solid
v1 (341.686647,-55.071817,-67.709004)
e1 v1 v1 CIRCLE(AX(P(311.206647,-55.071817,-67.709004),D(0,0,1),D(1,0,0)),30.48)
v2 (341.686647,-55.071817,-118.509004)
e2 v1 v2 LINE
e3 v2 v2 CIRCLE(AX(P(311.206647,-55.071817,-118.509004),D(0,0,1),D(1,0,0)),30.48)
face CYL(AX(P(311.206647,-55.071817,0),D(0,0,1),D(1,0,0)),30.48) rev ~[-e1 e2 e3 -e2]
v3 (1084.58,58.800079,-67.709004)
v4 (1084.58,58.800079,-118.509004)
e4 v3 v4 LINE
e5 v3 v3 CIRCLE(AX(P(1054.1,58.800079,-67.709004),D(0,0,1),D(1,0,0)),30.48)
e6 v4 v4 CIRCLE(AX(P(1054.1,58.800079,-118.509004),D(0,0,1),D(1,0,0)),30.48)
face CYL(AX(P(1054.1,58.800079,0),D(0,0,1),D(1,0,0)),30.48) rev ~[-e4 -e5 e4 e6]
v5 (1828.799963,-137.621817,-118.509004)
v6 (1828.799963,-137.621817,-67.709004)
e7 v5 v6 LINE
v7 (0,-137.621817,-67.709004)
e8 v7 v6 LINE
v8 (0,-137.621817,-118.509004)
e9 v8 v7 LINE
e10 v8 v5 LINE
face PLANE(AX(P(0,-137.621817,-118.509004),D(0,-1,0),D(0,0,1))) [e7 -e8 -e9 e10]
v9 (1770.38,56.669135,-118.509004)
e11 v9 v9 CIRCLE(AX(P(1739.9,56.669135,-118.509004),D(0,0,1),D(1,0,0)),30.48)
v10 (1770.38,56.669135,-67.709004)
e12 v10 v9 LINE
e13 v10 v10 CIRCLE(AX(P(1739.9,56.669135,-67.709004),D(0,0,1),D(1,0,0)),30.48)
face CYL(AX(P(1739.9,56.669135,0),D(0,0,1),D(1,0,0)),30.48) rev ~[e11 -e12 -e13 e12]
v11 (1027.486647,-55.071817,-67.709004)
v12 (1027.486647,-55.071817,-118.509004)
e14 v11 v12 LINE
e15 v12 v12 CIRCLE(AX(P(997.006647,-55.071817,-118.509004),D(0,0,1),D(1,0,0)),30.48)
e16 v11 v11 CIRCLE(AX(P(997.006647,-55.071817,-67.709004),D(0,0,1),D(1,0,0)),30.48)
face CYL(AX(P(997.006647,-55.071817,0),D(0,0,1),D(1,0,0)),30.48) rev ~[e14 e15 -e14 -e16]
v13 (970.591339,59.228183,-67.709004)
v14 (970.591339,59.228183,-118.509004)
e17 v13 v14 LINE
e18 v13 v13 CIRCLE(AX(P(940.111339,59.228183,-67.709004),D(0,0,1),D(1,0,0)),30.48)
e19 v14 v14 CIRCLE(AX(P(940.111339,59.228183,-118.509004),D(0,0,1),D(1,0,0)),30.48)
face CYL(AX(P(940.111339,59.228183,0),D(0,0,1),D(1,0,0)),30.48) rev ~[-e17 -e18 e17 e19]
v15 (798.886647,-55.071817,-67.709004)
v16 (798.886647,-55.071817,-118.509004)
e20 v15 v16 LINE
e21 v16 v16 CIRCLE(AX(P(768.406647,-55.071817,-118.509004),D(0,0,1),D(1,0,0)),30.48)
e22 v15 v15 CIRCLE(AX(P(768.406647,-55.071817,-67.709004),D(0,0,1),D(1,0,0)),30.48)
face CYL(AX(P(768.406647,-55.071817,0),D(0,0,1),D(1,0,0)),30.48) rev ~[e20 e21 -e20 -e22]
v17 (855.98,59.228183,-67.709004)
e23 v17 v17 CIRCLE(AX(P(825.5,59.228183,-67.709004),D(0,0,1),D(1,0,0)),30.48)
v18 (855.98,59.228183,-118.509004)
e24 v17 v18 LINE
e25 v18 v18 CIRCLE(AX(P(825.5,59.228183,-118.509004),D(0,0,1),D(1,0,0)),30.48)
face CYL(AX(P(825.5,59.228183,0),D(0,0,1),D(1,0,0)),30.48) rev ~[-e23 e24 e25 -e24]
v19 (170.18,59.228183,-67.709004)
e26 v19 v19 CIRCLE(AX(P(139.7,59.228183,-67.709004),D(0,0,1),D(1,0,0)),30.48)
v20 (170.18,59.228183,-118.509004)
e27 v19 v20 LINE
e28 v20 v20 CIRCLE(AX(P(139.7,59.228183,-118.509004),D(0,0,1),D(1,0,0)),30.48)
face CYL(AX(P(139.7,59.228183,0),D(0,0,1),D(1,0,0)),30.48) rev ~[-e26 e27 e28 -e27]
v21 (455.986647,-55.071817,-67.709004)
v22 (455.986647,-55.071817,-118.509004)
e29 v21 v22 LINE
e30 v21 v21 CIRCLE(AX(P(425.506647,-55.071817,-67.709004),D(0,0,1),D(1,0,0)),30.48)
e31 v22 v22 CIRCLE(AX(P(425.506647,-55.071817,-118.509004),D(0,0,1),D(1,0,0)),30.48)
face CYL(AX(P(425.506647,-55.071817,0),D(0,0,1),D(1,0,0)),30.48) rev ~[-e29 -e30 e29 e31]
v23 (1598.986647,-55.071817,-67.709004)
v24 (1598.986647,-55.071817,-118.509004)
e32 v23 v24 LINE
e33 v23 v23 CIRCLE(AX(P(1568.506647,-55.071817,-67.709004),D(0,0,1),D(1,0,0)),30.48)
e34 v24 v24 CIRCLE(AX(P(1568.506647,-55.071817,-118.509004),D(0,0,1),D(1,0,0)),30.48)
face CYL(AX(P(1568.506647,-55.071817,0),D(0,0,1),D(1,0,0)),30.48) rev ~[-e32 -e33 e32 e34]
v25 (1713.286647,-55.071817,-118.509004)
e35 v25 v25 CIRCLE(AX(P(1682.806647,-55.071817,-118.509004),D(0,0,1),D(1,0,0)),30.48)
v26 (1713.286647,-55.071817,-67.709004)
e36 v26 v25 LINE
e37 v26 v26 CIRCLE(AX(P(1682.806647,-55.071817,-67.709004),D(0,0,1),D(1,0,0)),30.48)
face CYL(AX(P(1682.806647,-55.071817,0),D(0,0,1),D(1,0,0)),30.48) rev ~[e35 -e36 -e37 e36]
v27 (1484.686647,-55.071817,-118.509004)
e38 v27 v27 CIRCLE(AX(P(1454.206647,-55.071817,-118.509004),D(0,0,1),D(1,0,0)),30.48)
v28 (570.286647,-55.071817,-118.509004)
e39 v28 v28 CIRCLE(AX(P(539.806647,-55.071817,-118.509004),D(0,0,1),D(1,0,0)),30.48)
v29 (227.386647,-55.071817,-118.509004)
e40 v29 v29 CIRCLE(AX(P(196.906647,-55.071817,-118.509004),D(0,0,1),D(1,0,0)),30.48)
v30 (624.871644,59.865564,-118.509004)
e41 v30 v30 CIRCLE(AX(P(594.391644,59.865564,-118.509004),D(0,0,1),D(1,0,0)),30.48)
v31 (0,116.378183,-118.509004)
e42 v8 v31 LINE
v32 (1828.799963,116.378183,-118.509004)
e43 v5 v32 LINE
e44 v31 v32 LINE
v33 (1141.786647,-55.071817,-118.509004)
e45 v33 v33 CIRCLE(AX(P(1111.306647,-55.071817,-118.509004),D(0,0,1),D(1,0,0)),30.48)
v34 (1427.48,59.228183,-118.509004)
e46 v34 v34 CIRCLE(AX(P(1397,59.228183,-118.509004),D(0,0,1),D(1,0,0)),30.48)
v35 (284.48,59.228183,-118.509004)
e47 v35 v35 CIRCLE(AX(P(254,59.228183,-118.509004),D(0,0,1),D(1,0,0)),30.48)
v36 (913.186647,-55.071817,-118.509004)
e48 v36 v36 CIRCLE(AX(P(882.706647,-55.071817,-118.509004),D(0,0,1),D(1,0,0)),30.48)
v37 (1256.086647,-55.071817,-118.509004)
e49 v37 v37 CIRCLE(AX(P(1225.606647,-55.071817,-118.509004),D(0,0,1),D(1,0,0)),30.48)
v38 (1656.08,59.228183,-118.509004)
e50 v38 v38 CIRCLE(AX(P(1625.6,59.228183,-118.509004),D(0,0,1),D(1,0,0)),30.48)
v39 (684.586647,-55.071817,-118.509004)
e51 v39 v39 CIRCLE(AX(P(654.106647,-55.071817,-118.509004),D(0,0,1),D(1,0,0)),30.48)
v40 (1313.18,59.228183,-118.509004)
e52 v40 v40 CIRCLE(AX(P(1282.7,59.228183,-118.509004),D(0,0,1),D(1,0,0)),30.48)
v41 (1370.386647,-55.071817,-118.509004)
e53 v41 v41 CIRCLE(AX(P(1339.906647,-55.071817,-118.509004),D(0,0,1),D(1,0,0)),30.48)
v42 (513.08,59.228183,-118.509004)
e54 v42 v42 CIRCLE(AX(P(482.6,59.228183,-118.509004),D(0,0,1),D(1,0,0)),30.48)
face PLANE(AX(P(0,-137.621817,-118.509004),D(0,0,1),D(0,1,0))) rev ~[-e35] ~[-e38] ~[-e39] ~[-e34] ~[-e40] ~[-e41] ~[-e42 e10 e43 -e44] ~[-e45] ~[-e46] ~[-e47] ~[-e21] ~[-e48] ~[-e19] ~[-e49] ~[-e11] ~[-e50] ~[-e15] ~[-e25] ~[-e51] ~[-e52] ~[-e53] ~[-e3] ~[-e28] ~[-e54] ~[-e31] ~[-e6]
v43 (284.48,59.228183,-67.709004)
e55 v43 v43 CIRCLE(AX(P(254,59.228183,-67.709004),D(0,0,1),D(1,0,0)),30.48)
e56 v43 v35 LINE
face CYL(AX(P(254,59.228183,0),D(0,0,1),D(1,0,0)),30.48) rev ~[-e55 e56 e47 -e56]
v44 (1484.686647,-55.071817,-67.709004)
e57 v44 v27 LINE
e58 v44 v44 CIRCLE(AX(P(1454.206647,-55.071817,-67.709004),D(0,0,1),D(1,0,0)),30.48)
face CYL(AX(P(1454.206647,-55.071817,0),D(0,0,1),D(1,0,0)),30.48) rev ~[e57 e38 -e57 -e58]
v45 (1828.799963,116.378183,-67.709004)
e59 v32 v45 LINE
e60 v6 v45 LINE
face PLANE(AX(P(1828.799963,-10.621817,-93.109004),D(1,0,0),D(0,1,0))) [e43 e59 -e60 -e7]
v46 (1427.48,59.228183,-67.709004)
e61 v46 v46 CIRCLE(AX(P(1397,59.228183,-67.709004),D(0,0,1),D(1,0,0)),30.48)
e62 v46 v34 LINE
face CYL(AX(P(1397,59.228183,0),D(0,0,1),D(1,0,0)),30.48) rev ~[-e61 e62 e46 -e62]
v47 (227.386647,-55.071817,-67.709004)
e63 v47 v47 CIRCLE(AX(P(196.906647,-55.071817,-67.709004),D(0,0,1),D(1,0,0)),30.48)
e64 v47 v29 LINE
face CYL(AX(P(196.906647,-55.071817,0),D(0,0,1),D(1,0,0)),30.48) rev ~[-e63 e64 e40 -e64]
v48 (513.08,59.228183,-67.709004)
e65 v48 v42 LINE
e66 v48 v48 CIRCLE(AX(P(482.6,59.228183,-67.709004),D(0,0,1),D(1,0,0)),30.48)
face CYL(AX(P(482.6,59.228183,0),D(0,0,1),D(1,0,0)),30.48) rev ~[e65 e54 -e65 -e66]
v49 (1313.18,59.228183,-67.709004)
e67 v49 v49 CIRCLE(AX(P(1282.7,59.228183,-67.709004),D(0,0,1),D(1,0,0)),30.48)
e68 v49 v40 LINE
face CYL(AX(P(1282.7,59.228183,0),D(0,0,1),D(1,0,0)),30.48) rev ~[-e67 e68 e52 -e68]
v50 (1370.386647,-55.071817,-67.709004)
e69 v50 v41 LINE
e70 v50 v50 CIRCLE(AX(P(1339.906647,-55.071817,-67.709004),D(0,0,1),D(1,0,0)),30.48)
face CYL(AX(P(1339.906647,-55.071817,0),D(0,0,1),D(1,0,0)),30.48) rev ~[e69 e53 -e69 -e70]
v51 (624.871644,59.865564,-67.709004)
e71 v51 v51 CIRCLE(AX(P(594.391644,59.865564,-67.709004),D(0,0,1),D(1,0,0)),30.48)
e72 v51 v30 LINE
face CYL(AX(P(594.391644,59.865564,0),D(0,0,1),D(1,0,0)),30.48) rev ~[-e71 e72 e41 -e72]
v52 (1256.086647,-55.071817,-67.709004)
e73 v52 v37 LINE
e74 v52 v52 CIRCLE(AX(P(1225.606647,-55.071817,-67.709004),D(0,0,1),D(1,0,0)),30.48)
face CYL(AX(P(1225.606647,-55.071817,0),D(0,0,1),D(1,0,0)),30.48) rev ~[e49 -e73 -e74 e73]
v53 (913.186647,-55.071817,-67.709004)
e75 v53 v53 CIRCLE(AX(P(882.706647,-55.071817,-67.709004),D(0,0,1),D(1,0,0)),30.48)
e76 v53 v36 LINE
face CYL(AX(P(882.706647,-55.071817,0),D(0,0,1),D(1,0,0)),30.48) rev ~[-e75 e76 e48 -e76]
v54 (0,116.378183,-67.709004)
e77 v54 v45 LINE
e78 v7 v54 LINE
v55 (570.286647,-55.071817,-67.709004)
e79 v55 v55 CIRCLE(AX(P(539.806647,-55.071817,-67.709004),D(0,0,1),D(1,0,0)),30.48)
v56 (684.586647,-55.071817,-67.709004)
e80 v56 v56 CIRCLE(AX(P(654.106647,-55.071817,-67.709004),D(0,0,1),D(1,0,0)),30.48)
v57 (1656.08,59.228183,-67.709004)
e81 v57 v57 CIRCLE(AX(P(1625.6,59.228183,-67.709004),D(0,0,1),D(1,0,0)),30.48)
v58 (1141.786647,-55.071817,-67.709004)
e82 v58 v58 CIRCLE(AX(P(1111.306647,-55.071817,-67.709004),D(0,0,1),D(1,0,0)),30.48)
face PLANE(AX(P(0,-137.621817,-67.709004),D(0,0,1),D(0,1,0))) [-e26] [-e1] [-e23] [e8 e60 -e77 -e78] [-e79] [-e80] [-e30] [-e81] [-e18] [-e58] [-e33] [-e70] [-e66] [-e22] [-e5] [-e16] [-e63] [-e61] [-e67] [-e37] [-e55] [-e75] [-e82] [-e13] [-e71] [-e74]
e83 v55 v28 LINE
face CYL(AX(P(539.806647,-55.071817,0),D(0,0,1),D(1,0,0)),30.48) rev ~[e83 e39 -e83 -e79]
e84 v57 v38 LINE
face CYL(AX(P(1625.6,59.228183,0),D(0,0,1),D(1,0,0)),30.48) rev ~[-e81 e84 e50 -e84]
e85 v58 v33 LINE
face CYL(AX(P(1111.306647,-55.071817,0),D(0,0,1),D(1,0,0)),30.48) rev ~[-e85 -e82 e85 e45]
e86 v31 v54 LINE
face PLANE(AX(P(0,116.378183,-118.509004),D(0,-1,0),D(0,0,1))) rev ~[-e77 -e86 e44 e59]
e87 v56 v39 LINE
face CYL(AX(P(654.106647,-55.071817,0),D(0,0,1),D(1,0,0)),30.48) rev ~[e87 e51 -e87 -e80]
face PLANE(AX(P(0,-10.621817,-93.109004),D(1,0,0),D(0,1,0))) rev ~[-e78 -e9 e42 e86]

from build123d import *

# Parameters (mm, degrees)
F0_W     = 254
F0_H     = 50.8
F1_DEPTH = 1828.7999629974
F2_R     = 30.48
F3_DEPTH = 127


# Not quite as in the source:
# - a feature names something its author has since deleted; it is built from what else it names


with BuildPart() as f1:
    # F0 (on Right) → F1 (new body)
    with BuildSketch(Plane.YZ):
        with Locations((-10.6218170047, -93.1090038955)):
            Rectangle(F0_W, F0_H)
    extrude(amount=F1_DEPTH)

    # F2 (on Top) → F3 (cut)
    with BuildSketch(Plane.XY):
        with Locations((139.7, 59.2281829953)):
            Circle(F2_R)
        with Locations((254, 59.2281829953)):
            Circle(F2_R)
        with Locations((196.9066466086, -55.0718170047)):
            Circle(F2_R)
        with Locations((311.2066466086, -55.0718170047)):
            Circle(F2_R)
        with Locations((425.5066466086, -55.0718170047)):
            Circle(F2_R)
        with Locations((539.8066466086, -55.0718170047)):
            Circle(F2_R)
        with Locations((482.6, 59.2281829953)):
            Circle(F2_R)
        with Locations((594.391644001, 59.8655641079)):
            Circle(F2_R)
        with Locations((654.1066466086, -55.0718170047)):
            Circle(F2_R)
        with Locations((768.4066466086, -55.0718170047)):
            Circle(F2_R)
        with Locations((882.7066466086, -55.0718170047)):
            Circle(F2_R)
        with Locations((825.5, 59.2281829953)):
            Circle(F2_R)
        with Locations((940.1113390923, 59.2281829953)):
            Circle(F2_R)
        with Locations((997.0066466086, -55.0718170047)):
            Circle(F2_R)
        with Locations((1111.3066466086, -55.0718170047)):
            Circle(F2_R)
        with Locations((1054.1, 58.8000789285)):
            Circle(F2_R)
        with Locations((1225.6066466086, -55.0718170047)):
            Circle(F2_R)
        with Locations((1339.9066466086, -55.0718170047)):
            Circle(F2_R)
        with Locations((1282.7, 59.2281829953)):
            Circle(F2_R)
        with Locations((1397, 59.2281829953)):
            Circle(F2_R)
        with Locations((1454.2066466086, -55.0718170047)):
            Circle(F2_R)
        with Locations((1568.5066466086, -55.0718170047)):
            Circle(F2_R)
        with Locations((1625.6, 59.2281829953)):
            Circle(F2_R)
        with Locations((1682.8066466086, -55.0718170047)):
            Circle(F2_R)
        with Locations((1739.9, 56.6691346467)):
            Circle(F2_R)
    extrude(amount=-F3_DEPTH, mode=Mode.SUBTRACT)


solid = f1.part
